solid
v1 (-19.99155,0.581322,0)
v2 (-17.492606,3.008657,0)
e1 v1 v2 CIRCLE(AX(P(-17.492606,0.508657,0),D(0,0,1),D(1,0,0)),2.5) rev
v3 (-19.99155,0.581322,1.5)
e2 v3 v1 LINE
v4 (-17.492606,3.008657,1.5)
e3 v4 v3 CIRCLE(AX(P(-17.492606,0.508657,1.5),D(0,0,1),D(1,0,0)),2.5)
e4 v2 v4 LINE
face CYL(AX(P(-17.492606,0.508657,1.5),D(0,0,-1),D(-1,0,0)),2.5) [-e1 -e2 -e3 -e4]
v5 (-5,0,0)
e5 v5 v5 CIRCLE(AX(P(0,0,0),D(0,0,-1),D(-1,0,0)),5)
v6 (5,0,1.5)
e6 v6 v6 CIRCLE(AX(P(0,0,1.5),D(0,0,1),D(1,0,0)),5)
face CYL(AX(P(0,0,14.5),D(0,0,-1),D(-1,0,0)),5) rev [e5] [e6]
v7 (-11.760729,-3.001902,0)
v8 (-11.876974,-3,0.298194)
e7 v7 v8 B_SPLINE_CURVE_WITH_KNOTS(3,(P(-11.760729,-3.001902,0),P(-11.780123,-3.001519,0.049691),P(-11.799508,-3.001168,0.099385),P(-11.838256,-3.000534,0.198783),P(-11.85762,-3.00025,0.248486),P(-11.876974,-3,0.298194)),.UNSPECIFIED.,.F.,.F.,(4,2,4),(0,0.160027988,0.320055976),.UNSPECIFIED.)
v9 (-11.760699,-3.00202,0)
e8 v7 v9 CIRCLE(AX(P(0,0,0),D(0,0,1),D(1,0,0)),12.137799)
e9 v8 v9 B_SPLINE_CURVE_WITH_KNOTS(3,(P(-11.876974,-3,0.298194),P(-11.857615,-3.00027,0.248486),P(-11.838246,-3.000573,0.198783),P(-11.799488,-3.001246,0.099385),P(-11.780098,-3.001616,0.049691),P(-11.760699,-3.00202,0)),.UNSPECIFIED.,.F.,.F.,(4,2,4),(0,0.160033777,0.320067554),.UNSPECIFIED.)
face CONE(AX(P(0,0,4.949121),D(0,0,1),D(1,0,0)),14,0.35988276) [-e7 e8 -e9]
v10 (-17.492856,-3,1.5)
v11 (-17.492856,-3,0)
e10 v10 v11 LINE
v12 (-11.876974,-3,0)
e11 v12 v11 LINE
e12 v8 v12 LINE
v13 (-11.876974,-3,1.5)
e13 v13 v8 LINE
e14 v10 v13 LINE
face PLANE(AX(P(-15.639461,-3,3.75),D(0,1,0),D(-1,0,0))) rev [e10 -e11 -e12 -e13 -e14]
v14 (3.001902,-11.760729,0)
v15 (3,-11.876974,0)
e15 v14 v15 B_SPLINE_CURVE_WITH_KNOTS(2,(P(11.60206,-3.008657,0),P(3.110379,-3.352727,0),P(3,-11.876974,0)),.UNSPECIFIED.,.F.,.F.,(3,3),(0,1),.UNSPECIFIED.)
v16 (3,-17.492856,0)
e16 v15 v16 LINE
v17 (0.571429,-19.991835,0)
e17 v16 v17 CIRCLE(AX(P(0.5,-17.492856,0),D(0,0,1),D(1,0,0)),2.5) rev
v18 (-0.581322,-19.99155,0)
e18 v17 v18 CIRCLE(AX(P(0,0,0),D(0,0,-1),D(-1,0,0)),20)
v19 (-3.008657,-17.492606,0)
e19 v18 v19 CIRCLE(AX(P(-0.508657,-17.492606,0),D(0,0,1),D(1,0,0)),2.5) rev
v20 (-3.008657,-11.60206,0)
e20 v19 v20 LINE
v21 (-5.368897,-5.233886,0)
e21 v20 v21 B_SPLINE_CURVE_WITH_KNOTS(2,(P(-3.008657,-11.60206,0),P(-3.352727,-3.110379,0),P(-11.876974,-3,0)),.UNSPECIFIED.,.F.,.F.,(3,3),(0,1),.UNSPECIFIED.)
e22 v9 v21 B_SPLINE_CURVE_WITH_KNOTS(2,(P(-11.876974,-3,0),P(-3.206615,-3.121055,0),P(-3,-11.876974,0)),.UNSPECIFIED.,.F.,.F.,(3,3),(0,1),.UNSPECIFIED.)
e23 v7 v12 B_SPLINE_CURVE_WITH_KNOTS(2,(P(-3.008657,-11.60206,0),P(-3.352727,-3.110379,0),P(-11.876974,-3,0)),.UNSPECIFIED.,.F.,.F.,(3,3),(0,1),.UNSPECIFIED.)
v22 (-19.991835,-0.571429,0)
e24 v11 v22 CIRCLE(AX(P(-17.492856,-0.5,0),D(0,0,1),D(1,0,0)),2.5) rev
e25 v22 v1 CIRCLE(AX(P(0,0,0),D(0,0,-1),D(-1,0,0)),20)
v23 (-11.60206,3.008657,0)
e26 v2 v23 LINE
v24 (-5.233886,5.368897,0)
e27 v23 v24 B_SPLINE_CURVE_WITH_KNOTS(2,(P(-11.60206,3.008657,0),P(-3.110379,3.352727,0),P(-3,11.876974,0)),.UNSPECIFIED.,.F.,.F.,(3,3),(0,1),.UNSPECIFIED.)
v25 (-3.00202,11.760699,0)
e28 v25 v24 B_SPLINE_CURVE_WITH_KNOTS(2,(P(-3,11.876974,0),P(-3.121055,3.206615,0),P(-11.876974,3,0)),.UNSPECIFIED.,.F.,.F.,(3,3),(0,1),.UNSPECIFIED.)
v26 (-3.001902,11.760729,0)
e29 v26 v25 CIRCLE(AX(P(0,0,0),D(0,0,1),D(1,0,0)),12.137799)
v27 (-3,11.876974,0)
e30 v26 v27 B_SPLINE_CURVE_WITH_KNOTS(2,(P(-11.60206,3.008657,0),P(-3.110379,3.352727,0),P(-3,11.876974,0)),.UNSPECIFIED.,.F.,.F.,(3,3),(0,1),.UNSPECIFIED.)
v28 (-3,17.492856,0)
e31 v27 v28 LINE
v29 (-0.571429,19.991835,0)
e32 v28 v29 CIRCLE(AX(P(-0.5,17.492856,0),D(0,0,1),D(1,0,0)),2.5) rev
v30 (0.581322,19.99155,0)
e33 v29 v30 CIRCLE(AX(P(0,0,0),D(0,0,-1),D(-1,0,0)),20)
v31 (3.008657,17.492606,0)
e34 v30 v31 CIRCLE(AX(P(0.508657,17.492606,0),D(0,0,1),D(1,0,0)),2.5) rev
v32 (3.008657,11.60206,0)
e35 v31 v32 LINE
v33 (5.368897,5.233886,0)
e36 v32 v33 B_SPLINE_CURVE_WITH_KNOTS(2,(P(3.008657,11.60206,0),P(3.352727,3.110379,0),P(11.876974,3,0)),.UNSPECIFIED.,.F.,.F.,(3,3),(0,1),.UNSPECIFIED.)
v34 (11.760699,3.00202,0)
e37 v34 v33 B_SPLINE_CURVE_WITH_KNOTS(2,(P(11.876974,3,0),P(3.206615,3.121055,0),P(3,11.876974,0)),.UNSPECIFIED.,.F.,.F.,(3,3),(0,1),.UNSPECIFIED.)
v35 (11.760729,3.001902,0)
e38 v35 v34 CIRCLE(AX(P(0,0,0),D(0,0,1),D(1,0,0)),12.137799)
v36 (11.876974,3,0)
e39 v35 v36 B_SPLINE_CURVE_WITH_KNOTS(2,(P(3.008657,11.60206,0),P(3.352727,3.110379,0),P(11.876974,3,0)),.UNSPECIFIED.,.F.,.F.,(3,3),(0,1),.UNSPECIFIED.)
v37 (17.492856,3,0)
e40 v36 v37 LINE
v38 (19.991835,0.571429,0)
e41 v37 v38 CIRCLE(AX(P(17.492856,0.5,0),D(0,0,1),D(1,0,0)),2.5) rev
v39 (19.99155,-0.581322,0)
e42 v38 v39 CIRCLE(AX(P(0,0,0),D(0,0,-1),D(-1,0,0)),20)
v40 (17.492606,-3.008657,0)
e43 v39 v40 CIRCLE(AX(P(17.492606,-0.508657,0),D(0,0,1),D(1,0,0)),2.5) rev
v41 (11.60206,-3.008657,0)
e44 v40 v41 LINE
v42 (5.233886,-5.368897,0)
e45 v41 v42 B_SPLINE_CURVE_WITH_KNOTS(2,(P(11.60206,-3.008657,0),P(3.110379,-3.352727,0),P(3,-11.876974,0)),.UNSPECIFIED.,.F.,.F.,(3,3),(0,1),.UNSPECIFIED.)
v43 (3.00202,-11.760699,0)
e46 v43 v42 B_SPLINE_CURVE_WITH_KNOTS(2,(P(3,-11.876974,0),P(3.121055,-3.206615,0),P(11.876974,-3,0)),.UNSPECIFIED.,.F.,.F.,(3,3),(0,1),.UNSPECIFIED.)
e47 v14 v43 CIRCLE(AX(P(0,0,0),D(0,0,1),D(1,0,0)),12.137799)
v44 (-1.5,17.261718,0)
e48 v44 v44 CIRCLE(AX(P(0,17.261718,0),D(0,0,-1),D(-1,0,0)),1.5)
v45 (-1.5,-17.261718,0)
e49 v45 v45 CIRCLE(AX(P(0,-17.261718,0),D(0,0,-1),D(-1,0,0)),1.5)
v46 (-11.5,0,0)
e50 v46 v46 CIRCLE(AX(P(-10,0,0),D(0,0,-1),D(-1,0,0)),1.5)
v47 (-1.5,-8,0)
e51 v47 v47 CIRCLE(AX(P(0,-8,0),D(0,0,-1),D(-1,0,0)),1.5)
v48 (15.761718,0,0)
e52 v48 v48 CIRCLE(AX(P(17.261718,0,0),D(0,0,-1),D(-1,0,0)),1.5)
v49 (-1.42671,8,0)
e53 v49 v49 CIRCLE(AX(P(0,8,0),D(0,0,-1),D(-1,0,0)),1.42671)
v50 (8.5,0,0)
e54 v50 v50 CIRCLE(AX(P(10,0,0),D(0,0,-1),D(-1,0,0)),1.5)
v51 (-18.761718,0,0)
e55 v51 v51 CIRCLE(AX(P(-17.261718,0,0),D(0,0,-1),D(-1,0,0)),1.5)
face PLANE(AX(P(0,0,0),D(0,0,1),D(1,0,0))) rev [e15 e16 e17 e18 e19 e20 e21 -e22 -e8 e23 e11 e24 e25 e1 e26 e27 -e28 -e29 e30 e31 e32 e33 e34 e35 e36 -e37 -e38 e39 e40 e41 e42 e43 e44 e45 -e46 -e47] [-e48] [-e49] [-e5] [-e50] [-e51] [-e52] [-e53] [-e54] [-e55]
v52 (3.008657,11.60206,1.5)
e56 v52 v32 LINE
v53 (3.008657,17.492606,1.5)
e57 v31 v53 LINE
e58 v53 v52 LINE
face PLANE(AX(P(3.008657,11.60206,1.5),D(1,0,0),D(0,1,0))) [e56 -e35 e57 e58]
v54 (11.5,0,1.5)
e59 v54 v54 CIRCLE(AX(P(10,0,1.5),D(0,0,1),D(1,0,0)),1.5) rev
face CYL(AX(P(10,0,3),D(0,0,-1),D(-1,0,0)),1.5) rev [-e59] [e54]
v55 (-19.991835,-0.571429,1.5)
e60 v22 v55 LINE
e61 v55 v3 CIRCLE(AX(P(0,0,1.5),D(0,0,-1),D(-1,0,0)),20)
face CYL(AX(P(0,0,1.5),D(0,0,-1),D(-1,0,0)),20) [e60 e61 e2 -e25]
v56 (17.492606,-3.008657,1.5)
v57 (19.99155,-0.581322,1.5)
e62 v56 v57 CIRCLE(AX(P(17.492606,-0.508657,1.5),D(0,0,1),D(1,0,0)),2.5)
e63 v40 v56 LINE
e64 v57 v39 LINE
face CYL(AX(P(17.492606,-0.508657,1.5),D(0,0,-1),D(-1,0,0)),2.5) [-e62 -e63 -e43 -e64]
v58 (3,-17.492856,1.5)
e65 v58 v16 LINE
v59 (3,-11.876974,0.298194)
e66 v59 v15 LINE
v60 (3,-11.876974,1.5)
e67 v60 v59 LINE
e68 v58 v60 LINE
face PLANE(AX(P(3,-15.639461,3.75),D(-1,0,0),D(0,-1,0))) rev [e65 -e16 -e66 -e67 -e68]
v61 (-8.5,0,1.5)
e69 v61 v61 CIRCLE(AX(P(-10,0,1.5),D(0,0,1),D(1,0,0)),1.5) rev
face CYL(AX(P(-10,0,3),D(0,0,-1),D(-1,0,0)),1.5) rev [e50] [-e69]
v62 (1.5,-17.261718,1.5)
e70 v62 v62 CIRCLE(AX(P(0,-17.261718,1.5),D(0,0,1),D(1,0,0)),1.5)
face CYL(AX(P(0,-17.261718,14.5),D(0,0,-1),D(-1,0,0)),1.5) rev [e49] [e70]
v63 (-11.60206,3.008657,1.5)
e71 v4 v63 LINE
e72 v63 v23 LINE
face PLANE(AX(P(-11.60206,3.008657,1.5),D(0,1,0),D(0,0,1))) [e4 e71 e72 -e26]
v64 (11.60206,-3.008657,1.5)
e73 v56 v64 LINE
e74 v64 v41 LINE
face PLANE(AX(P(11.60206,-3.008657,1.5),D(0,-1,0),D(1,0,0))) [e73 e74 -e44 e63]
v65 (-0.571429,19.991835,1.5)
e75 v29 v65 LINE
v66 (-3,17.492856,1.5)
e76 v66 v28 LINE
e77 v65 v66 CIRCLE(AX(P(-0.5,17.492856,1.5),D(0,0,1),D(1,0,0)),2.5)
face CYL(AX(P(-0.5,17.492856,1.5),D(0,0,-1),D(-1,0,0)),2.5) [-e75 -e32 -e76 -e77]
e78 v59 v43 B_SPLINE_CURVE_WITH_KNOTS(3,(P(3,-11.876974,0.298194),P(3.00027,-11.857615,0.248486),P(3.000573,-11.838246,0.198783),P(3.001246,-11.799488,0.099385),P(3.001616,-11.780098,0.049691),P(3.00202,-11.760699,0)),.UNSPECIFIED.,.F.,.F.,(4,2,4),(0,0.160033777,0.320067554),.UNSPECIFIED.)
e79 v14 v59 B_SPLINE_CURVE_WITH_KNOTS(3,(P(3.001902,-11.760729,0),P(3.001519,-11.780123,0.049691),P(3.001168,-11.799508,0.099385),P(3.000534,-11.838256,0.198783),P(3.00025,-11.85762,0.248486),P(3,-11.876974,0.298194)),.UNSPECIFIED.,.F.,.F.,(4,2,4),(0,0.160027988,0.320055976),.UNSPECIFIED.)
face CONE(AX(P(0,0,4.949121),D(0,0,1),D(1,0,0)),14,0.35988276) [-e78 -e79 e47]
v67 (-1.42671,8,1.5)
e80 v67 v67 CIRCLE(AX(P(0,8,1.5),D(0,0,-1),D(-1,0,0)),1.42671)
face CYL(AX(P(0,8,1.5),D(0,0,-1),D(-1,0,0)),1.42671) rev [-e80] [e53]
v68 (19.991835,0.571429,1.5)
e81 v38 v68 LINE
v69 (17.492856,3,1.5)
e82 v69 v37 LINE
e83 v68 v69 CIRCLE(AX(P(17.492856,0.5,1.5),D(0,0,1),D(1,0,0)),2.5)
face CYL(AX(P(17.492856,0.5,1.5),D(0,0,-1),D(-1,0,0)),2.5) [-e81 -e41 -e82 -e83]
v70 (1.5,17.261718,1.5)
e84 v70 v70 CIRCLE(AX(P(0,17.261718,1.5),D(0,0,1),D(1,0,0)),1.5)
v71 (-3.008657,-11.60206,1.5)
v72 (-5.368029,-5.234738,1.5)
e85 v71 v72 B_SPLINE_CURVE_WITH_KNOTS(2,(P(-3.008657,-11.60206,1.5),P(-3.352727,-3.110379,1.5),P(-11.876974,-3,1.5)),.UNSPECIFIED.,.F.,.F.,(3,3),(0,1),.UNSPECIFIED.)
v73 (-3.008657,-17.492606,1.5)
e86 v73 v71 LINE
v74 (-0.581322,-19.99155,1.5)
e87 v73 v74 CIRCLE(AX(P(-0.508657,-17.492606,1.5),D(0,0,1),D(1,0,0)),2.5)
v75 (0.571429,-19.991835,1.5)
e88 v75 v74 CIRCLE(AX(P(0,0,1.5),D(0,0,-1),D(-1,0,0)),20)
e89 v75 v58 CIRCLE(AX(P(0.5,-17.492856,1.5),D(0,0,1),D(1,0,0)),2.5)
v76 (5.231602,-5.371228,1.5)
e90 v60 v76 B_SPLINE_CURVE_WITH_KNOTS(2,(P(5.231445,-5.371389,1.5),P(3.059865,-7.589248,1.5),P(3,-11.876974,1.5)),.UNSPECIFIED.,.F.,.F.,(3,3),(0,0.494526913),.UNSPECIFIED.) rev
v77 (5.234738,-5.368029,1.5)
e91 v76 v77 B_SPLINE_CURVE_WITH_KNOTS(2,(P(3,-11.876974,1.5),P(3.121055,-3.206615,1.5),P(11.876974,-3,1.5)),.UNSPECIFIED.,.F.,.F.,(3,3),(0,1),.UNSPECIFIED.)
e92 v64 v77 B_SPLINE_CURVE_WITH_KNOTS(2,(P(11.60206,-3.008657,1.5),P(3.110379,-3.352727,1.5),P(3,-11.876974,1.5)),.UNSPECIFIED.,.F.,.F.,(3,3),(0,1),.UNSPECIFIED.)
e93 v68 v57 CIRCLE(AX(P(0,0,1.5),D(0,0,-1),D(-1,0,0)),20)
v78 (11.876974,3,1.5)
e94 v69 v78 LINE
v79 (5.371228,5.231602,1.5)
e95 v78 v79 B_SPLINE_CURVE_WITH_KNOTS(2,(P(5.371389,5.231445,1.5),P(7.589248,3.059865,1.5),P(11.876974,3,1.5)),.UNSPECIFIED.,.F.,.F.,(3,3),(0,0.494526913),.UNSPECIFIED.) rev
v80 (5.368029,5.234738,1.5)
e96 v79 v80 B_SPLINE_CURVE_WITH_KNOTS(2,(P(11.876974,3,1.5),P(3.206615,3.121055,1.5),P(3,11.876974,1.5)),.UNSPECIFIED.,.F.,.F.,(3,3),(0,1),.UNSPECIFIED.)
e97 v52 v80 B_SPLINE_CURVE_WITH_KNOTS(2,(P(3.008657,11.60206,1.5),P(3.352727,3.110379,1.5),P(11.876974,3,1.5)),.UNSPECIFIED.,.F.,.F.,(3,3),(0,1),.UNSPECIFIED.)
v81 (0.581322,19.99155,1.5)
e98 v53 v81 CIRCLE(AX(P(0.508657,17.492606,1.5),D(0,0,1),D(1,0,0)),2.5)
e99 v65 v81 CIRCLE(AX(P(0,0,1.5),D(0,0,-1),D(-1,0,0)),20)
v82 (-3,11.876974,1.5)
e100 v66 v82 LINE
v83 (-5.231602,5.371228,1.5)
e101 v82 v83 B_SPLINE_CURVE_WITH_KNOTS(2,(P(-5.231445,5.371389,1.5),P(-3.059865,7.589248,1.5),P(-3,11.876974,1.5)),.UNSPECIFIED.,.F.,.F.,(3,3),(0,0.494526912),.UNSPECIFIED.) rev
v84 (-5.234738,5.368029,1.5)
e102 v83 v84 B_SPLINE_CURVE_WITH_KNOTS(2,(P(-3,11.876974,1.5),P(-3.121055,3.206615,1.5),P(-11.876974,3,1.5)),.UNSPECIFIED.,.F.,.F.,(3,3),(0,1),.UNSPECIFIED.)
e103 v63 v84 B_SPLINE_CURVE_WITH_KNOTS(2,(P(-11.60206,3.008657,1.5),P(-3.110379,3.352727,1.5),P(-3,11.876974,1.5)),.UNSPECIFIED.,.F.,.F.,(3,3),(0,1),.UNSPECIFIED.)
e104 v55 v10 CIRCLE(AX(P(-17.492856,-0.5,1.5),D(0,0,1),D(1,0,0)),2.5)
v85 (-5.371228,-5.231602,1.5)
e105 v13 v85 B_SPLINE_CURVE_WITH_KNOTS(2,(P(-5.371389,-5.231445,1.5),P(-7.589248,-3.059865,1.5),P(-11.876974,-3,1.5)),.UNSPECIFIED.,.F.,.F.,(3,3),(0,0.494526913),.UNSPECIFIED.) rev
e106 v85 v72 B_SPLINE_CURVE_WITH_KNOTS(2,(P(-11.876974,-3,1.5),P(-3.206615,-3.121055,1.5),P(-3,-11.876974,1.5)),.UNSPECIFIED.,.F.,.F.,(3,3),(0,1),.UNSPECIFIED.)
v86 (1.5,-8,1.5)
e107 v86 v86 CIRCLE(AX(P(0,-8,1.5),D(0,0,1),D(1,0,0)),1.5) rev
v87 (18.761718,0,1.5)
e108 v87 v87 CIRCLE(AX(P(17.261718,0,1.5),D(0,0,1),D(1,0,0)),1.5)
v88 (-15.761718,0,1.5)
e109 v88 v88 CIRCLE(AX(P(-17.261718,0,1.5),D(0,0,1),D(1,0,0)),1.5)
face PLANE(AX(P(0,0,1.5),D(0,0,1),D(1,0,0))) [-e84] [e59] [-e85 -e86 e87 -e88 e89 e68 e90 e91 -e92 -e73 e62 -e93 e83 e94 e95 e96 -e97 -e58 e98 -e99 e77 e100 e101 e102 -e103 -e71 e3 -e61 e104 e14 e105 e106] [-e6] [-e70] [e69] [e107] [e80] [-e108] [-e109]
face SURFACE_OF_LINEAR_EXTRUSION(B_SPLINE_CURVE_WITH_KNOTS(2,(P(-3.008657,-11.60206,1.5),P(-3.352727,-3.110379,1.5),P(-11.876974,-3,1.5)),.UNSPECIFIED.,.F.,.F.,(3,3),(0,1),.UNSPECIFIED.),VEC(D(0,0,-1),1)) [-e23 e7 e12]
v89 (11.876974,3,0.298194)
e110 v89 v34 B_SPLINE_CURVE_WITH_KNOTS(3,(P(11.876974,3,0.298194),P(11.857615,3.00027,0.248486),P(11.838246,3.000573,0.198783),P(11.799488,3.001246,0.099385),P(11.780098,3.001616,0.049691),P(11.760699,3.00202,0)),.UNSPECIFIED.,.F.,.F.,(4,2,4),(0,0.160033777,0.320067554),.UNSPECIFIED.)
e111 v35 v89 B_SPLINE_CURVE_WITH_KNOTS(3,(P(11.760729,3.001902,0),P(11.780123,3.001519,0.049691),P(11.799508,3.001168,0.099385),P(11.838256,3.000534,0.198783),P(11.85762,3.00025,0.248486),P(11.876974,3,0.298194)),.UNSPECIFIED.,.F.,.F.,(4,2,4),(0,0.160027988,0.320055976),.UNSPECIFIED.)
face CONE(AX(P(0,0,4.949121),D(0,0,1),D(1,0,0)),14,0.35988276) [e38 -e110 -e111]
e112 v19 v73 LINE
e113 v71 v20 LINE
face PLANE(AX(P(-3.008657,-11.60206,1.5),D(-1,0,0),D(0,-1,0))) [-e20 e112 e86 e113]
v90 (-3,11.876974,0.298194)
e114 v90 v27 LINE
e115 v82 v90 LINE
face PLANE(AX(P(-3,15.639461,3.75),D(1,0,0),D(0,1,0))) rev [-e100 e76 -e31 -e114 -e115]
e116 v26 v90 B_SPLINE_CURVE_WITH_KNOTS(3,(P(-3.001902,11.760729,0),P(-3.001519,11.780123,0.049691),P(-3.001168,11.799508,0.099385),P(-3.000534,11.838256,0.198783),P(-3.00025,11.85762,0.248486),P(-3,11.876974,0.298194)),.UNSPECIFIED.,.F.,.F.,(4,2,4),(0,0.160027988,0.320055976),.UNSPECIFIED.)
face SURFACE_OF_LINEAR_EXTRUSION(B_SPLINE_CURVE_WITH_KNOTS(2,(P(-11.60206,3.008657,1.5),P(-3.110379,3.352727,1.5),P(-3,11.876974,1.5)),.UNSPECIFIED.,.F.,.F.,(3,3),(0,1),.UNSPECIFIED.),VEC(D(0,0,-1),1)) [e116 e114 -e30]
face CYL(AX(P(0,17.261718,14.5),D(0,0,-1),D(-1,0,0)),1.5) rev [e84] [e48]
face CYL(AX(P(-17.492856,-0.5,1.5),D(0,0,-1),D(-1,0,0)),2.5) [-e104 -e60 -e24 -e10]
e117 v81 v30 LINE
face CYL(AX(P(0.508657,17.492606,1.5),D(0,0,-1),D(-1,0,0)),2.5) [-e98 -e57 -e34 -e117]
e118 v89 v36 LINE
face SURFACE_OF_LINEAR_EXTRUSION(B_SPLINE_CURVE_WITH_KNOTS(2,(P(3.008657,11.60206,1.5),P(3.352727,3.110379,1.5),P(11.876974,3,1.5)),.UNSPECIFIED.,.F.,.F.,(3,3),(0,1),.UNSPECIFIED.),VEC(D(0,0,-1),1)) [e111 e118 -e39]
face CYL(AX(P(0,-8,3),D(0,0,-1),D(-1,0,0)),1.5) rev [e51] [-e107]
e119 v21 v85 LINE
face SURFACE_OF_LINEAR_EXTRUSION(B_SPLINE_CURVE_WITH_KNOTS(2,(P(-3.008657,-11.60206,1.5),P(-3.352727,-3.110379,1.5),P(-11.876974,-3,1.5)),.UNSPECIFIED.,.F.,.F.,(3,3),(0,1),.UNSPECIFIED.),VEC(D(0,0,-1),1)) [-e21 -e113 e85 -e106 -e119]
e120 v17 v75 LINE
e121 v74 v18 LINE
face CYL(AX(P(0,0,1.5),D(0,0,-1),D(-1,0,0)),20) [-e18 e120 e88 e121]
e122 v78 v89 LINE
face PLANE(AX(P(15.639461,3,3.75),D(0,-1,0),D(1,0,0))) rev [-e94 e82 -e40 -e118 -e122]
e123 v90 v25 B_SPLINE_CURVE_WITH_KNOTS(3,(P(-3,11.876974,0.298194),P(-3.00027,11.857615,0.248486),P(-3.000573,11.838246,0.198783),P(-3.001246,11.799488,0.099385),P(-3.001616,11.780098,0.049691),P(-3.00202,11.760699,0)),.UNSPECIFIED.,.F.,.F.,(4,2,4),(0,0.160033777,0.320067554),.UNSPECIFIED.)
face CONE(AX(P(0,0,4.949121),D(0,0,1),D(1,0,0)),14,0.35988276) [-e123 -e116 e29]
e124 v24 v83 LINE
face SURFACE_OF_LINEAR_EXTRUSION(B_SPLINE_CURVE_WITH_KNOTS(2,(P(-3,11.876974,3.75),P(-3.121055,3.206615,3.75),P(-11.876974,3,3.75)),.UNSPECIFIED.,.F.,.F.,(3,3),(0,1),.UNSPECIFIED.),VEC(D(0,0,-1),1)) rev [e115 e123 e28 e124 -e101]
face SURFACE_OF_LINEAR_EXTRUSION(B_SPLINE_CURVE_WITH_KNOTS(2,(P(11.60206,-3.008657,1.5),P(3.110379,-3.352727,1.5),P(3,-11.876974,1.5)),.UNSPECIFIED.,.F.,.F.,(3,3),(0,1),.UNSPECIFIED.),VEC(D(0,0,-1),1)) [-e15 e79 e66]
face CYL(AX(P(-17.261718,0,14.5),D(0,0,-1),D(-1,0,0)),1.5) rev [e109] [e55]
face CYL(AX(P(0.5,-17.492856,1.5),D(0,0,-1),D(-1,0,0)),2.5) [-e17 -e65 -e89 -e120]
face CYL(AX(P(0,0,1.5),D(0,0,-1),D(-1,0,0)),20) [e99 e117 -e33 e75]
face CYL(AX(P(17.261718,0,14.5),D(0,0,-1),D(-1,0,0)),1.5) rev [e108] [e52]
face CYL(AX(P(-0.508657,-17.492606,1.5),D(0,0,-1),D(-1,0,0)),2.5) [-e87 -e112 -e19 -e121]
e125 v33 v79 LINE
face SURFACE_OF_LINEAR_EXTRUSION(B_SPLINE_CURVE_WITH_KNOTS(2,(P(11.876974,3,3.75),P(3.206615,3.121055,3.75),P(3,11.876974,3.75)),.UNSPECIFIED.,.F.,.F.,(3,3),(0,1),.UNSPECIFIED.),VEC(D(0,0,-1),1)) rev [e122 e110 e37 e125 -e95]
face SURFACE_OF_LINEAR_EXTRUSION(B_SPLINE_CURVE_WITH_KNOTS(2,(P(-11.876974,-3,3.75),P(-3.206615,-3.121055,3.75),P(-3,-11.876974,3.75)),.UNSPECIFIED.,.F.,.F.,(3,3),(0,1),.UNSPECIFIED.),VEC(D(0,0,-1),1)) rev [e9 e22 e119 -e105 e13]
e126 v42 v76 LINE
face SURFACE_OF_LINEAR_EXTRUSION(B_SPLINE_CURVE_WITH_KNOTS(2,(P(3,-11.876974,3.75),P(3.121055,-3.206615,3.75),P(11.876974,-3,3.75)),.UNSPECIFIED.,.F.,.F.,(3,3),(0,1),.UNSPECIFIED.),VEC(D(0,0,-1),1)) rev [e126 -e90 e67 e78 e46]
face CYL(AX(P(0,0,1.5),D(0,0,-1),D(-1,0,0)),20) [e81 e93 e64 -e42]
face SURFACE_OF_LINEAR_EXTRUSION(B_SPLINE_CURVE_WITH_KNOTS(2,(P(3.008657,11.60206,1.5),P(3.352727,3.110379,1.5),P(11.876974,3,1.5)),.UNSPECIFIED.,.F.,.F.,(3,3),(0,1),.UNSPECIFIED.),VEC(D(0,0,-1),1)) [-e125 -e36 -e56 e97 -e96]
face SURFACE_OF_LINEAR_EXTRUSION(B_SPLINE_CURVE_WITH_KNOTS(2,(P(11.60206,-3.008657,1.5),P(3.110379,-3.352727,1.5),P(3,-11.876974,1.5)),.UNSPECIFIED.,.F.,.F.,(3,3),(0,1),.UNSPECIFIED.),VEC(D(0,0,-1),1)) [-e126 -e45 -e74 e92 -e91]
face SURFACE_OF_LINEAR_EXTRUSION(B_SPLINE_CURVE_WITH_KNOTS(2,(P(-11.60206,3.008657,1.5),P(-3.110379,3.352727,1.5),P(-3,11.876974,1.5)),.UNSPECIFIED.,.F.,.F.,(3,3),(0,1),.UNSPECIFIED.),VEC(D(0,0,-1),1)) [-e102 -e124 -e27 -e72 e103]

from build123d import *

# Parameters (mm, degrees)
SKETCH1_R                 = 14
BOSS_EXTRUDE1_DEPTH       = 18.5
CUT_EXTRUDE1_START        = -13.5
SKETCH2_R                 = 14
SKETCH2_R_2               = 5
CUT_EXTRUDE1_DEPTH        = 13.5
SKETCH3_R                 = 4
CUT_EXTRUDE2_DEPTH        = 22.5
CUT_EXTRUDE3_DEPTH        = 3.75
SKETCH8_R                 = 12.271364757
SKETCH8_R_2               = 6.141449245
CUT_EXTRUDE4_DEPTH        = 2.75
CIRPATTERN1_COUNT         = 4
SKETCH11_R                = 1.5
CUT_EXTRUDE5_DEPTH        = 3
SKETCH12_R                = 21.13637798
CUT_EXTRUDE6_DEPTH        = 17
BOSS_EXTRUDE2_START       = -1.5
BOSS_EXTRUDE2_OUTLINE_R   = 1.5
BOSS_EXTRUDE2_OUTLINE_R_2 = 1.517060808
BOSS_EXTRUDE2_OUTLINE_R_3 = 4
BOSS_EXTRUDE2_OUTLINE_R_4 = 1.426709917
BOSS_EXTRUDE2_DEPTH       = 1.5
FILLET1_R                 = 2.5
SKETCH14_R                = 1.5
SKETCH14_R_2              = 5
CUT_EXTRUDE7_DEPTH        = 14.5


# Read off the part's stored shape, not the designer's step: Boss-Extrude2
with BuildPart() as part:
    # Sketch1 → Boss-Extrude1 (new body)
    with BuildSketch(Plane.XY):
        Circle(SKETCH1_R)
    extrude(amount=BOSS_EXTRUDE1_DEPTH)

    # Sketch2 → Cut-Extrude1 (cut)
    with BuildSketch(Plane.XY.offset(18.5).offset(CUT_EXTRUDE1_START)):
        Circle(SKETCH2_R)
        Circle(SKETCH2_R_2, mode=Mode.SUBTRACT)
    extrude(amount=CUT_EXTRUDE1_DEPTH, mode=Mode.SUBTRACT)

    # Sketch3 → Cut-Extrude2 (cut)
    with BuildSketch(Plane.XY.offset(18.5)):
        Circle(SKETCH3_R)
    extrude(amount=-CUT_EXTRUDE2_DEPTH, mode=Mode.SUBTRACT)

    # Sketch6 → Cut-Revolve1 (revolve, cut)
    with BuildSketch(Plane(origin=(0, 0, 0), x_dir=(0, 0, -1), z_dir=(1, 0, 0)), mode=Mode.PRIVATE) as cut_revolve1_sk:
        Polygon((-4.949121361, 14), (3.777639186, 16.199586118), (5.061522468, 10.233304984), align=None)
    revolve(cut_revolve1_sk.sketch.rotate(Axis((0, 0, 19.921792725), (0, 0, -1)), 90), axis=Axis((0, 0, 19.921792725), (0, 0, -1)), mode=Mode.SUBTRACT)

    # Sketch7 → Cut-Extrude3 (cut)
    with BuildSketch(Plane(origin=(0, 0, 0), x_dir=(-1, 0, 0), z_dir=(0, 0, -1))):
        with BuildLine():
            Line((3, 15.639460569), (3, 11.87697352))
            add(Edge.make_bspline(
                [(3, 11.87697352), (3.121054504, 3.206614769), (11.87697352, 3)],
                knots=[0, 0, 0, 1, 1, 1], degree=2))
            Line((11.87697352, 3), (17.86108213, 3))
            Line((17.86108213, 3), (14.869027825, 14.316513241))
            Line((14.869027825, 14.316513241), (3, 15.639460569))
        make_face()
    cut_extrude3 = extrude(amount=-CUT_EXTRUDE3_DEPTH, mode=Mode.SUBTRACT)

    # Sketch8 → Cut-Extrude4 (cut)
    with BuildSketch(Plane.XY.offset(5)):
        Circle(SKETCH8_R)
        Circle(SKETCH8_R_2, mode=Mode.SUBTRACT)
    extrude(amount=-CUT_EXTRUDE4_DEPTH, mode=Mode.SUBTRACT)

    # Sketch9 → Cut-Revolve2 (revolve, cut)
    with BuildSketch(Plane(origin=(0, 0, 0), x_dir=(1, 0, 0), z_dir=(0, 1, 0)), mode=Mode.PRIVATE) as cut_revolve2_sk:
        Polygon((-12.001476603, -2.22152714), (-13.001507243, -5.36905248), (-11.155114973, -5.36905248), align=None)
    revolve(cut_revolve2_sk.sketch.rotate(Axis((0, 0, -1.742471472), (0, 0, 1)), 180), axis=Axis((0, 0, -1.742471472), (0, 0, 1)), mode=Mode.SUBTRACT)

    # Sketch10 → Cut-Revolve3 (revolve, cut)
    with BuildSketch(Plane(origin=(0, 0, 0), x_dir=(1, 0, 0), z_dir=(0, 1, 0)), mode=Mode.PRIVATE) as cut_revolve3_sk:
        Polygon((-5, -5), (-6.141449245, -2.28305418), (-6.572257958, -5.413209842), align=None)
    revolve(cut_revolve3_sk.sketch.rotate(Axis((0, 0, 0), (0, 0, -1)), 180), axis=Axis((0, 0, 0), (0, 0, -1)), mode=Mode.SUBTRACT)

    # CirPattern1: Cut-Extrude3 ×4 about axis
    cirpattern1_axis = Axis((0, 0, 3.75), (0, 0, 1))
    for i in range(1, CIRPATTERN1_COUNT):
        add(cut_extrude3.rotate(cirpattern1_axis, i * 360 / CIRPATTERN1_COUNT), mode=Mode.SUBTRACT)

    # Sketch11 → Cut-Extrude5 (cut)
    with BuildSketch(Plane(origin=(0, 0, 0), x_dir=(-1, 0, 0), z_dir=(0, 0, -1))):
        with Locations((0, 8)):
            Circle(SKETCH11_R)
        with Locations((0, -8)):
            Circle(SKETCH11_R)
        with Locations((-10, 0)):
            Circle(SKETCH11_R)
        with Locations((10, 0)):
            Circle(SKETCH11_R)
    extrude(amount=-CUT_EXTRUDE5_DEPTH, mode=Mode.SUBTRACT)

    # Sketch12 → Cut-Extrude6 (cut)
    with BuildSketch(Plane.XY.offset(18.5)):
        Circle(SKETCH12_R)
    extrude(amount=-CUT_EXTRUDE6_DEPTH, mode=Mode.SUBTRACT)

    # Boss-Extrude2 outline → Boss-Extrude2 (add)
    # profile 1 of 7: a face of its own
    with BuildSketch(Plane(origin=(0, 0, 0), x_dir=(-1, 0, 0), z_dir=(0, 0, -1)).offset(BOSS_EXTRUDE2_START)):
        with BuildLine():
            add(Edge.make_bspline(
                [(3.00190242, 11.760729011), (3.000755095, 11.818659857), (3, 11.87697352)],
                knots=[0.993159083, 0.993159083, 0.993159083, 1, 1, 1], degree=2))
            Line((3, 11.87697352), (3, 19.773719933))
            ThreePointArc((3, 19.773719933), (-0.004378174, 19.999999521), (-3.00865699, 19.772404586))
            Line((-3.00865699, 19.772404586), (-3.008656992, 11.602060374))
            add(Edge.make_bspline(
                [(-5.368896851, 5.233886038), (-3.175302873, 7.384008673), (-3.008656992, 11.602060374)],
                knots=[0.4948048, 0.4948048, 0.4948048, 0.984177857, 0.984177857, 0.984177857], degree=2))
            add(Edge.make_bspline(
                [(-5.368896851, 5.233886038), (-7.55686142, 3.085160323), (-11.760729011, 3.00190242)],
                knots=[0.496734279, 0.496734279, 0.496734279, 0.993159083, 0.993159083, 0.993159083], degree=2))
            add(Edge.make_bspline(
                [(-11.760729011, 3.00190242), (-11.818659857, 3.000755095), (-11.87697352, 3)],
                knots=[0.993159083, 0.993159083, 0.993159083, 1, 1, 1], degree=2))
            Line((-11.87697352, 3), (-19.773719933, 3))
            ThreePointArc((-19.773719933, 3), (-19.999999521, -0.004378174), (-19.772404586, -3.00865699))
            Line((-19.772404586, -3.00865699), (-11.602060374, -3.008656992))
            add(Edge.make_bspline(
                [(-5.233886038, -5.368896851), (-7.384008673, -3.175302873), (-11.602060374, -3.008656992)],
                knots=[0.4948048, 0.4948048, 0.4948048, 0.984177857, 0.984177857, 0.984177857], degree=2))
            add(Edge.make_bspline(
                [(-5.233886038, -5.368896851), (-3.085160323, -7.55686142), (-3.00190242, -11.760729011)],
                knots=[0.496734279, 0.496734279, 0.496734279, 0.993159083, 0.993159083, 0.993159083], degree=2))
            add(Edge.make_bspline(
                [(-3.00190242, -11.760729011), (-3.000755095, -11.818659857), (-3, -11.87697352)],
                knots=[0.993159083, 0.993159083, 0.993159083, 1, 1, 1], degree=2))
            Line((-3, -11.87697352), (-3, -19.773719933))
            ThreePointArc((-3, -19.773719933), (0.004378174, -19.999999521), (3.00865699, -19.772404586))
            Line((3.00865699, -19.772404586), (3.008656992, -11.602060374))
            add(Edge.make_bspline(
                [(5.368896851, -5.233886038), (3.175302873, -7.384008673), (3.008656992, -11.602060374)],
                knots=[0.4948048, 0.4948048, 0.4948048, 0.984177857, 0.984177857, 0.984177857], degree=2))
            add(Edge.make_bspline(
                [(5.368896851, -5.233886038), (7.55686142, -3.085160323), (11.760729011, -3.00190242)],
                knots=[0.496734279, 0.496734279, 0.496734279, 0.993159083, 0.993159083, 0.993159083], degree=2))
            add(Edge.make_bspline(
                [(11.760729011, -3.00190242), (11.818659857, -3.000755095), (11.87697352, -3)],
                knots=[0.993159083, 0.993159083, 0.993159083, 1, 1, 1], degree=2))
            Line((11.87697352, -3), (19.773719933, -3))
            ThreePointArc((19.773719933, -3), (19.999999521, 0.004378174), (19.772404586, 3.00865699))
            Line((19.772404586, 3.00865699), (11.602060374, 3.008656992))
            add(Edge.make_bspline(
                [(5.233886023, 5.368896867), (7.384008658, 3.175302874), (11.602060374, 3.008656992)],
                knots=[0.494804799, 0.494804799, 0.494804799, 0.984177857, 0.984177857, 0.984177857], degree=2))
            add(Edge.make_bspline(
                [(5.233886023, 5.368896867), (3.085160322, 7.556861435), (3.00190242, 11.760729011)],
                knots=[0.496734281, 0.496734281, 0.496734281, 0.993159083, 0.993159083, 0.993159083], degree=2))
        make_face()
        with Locations((0, -8)):
            Circle(BOSS_EXTRUDE2_OUTLINE_R, mode=Mode.SUBTRACT)
        with Locations((-10, 0)):
            Circle(BOSS_EXTRUDE2_OUTLINE_R_2, mode=Mode.SUBTRACT)
        Circle(BOSS_EXTRUDE2_OUTLINE_R_3, mode=Mode.SUBTRACT)
        with Locations((0, 8)):
            Circle(BOSS_EXTRUDE2_OUTLINE_R, mode=Mode.SUBTRACT)
        with Locations((10, 0)):
            Circle(BOSS_EXTRUDE2_OUTLINE_R, mode=Mode.SUBTRACT)
    # profile 2 of 7: a face of its own
    with BuildSketch(Plane(origin=(0, 0, 0), x_dir=(-1, 0, 0), z_dir=(0, 0, -1)).offset(BOSS_EXTRUDE2_START)):
        with BuildLine():
            add(Edge.make_bspline(
                [(11.60206042, 3.00865699), (7.383951275, 3.179568286), (5.233886023, 5.368896867)],
                knots=[0, 0, 0, 0.496734281, 0.496734281, 0.496734281], degree=2))
            add(Edge.make_bspline(
                [(5.233886023, 5.368896867), (7.384008658, 3.175302874), (11.60206042, 3.00865699)],
                knots=[0.494804799, 0.494804799, 0.494804799, 0.984177857, 0.984177857, 0.984177857], degree=2))
        make_face()
    # profile 3 of 7: a face of its own
    with BuildSketch(Plane(origin=(0, 0, 0), x_dir=(-1, 0, 0), z_dir=(0, 0, -1)).offset(BOSS_EXTRUDE2_START)):
        with BuildLine():
            add(Edge.make_bspline(
                [(-5.368896851, 5.233886038), (-3.175302873, 7.384008673), (-3.008656992, 11.602060374)],
                knots=[0.4948048, 0.4948048, 0.4948048, 0.984177857, 0.984177857, 0.984177857], degree=2))
            add(Edge.make_bspline(
                [(-3.008656992, 11.602060374), (-3.179568285, 7.383951289), (-5.368896851, 5.233886038)],
                knots=[0, 0, 0, 0.496734279, 0.496734279, 0.496734279], degree=2))
        make_face()
    # profile 4 of 7: a face of its own
    with BuildSketch(Plane(origin=(0, 0, 0), x_dir=(-1, 0, 0), z_dir=(0, 0, -1)).offset(BOSS_EXTRUDE2_START)):
        with BuildLine():
            add(Edge.make_bspline(
                [(3.00865699, -11.60206042), (3.179568285, -7.383951289), (5.368896851, -5.233886038)],
                knots=[0, 0, 0, 0.496734279, 0.496734279, 0.496734279], degree=2))
            add(Edge.make_bspline(
                [(5.368896851, -5.233886038), (3.175302873, -7.384008673), (3.00865699, -11.60206042)],
                knots=[0.4948048, 0.4948048, 0.4948048, 0.984177857, 0.984177857, 0.984177857], degree=2))
        make_face()
    # profile 5 of 7: a face of its own
    with BuildSketch(Plane(origin=(0, 0, 0), x_dir=(-1, 0, 0), z_dir=(0, 0, -1)).offset(BOSS_EXTRUDE2_START)):
        with BuildLine():
            add(Edge.make_bspline(
                [(-5.233886038, -5.368896851), (-7.384008673, -3.175302873), (-11.602060374, -3.008656992)],
                knots=[0.4948048, 0.4948048, 0.4948048, 0.984177857, 0.984177857, 0.984177857], degree=2))
            add(Edge.make_bspline(
                [(-11.602060374, -3.008656992), (-7.383951289, -3.179568285), (-5.233886038, -5.368896851)],
                knots=[0, 0, 0, 0.496734279, 0.496734279, 0.496734279], degree=2))
        make_face()
    # profile 6 of 7: a face of its own
    with BuildSketch(Plane(origin=(0, 0, 0), x_dir=(-1, 0, 0), z_dir=(0, 0, -1)).offset(BOSS_EXTRUDE2_START)):
        Circle(BOSS_EXTRUDE2_OUTLINE_R_3)
    # profile 7 of 7: a face of its own
    with BuildSketch(Plane(origin=(0, 0, 0), x_dir=(-1, 0, 0), z_dir=(0, 0, -1)).offset(BOSS_EXTRUDE2_START)):
        with Locations((0, 8)):
            Circle(BOSS_EXTRUDE2_OUTLINE_R)
        with Locations((0, 8)):
            Circle(BOSS_EXTRUDE2_OUTLINE_R_4, mode=Mode.SUBTRACT)
    extrude(amount=BOSS_EXTRUDE2_DEPTH)

    # Fillet1
    fillet1_edges = [part.edges().sort_by_distance(p)[0] for p in [
        (-19.772404586, 3.00865699, 0.75),
        (-19.773719933, -3, 0.75),
        (-3.00865699, -19.772404586, 0.75),
        (3, -19.773719933, 0.75),
        (19.772404586, -3.00865699, 0.75),
        (19.773719933, 3, 0.75),
        (-3, 19.773719933, 0.75),
        (3.00865699, 19.772404586, 0.75),
    ]]
    fillet(fillet1_edges, radius=FILLET1_R)

    # Sketch14 → Cut-Extrude7 (cut)
    with BuildSketch(Plane(origin=(0, 0, 0), x_dir=(-1, 0, 0), z_dir=(0, 0, -1))):
        with Locations((0, 17.261717903)):
            Circle(SKETCH14_R)
        with Locations((17.261717903, 0)):
            Circle(SKETCH14_R)
        with Locations((0, -17.261717903)):
            Circle(SKETCH14_R)
        with Locations((-17.261717903, 0)):
            Circle(SKETCH14_R)
        Circle(SKETCH14_R_2)
    extrude(amount=-CUT_EXTRUDE7_DEPTH, mode=Mode.SUBTRACT)


solid = part.part
